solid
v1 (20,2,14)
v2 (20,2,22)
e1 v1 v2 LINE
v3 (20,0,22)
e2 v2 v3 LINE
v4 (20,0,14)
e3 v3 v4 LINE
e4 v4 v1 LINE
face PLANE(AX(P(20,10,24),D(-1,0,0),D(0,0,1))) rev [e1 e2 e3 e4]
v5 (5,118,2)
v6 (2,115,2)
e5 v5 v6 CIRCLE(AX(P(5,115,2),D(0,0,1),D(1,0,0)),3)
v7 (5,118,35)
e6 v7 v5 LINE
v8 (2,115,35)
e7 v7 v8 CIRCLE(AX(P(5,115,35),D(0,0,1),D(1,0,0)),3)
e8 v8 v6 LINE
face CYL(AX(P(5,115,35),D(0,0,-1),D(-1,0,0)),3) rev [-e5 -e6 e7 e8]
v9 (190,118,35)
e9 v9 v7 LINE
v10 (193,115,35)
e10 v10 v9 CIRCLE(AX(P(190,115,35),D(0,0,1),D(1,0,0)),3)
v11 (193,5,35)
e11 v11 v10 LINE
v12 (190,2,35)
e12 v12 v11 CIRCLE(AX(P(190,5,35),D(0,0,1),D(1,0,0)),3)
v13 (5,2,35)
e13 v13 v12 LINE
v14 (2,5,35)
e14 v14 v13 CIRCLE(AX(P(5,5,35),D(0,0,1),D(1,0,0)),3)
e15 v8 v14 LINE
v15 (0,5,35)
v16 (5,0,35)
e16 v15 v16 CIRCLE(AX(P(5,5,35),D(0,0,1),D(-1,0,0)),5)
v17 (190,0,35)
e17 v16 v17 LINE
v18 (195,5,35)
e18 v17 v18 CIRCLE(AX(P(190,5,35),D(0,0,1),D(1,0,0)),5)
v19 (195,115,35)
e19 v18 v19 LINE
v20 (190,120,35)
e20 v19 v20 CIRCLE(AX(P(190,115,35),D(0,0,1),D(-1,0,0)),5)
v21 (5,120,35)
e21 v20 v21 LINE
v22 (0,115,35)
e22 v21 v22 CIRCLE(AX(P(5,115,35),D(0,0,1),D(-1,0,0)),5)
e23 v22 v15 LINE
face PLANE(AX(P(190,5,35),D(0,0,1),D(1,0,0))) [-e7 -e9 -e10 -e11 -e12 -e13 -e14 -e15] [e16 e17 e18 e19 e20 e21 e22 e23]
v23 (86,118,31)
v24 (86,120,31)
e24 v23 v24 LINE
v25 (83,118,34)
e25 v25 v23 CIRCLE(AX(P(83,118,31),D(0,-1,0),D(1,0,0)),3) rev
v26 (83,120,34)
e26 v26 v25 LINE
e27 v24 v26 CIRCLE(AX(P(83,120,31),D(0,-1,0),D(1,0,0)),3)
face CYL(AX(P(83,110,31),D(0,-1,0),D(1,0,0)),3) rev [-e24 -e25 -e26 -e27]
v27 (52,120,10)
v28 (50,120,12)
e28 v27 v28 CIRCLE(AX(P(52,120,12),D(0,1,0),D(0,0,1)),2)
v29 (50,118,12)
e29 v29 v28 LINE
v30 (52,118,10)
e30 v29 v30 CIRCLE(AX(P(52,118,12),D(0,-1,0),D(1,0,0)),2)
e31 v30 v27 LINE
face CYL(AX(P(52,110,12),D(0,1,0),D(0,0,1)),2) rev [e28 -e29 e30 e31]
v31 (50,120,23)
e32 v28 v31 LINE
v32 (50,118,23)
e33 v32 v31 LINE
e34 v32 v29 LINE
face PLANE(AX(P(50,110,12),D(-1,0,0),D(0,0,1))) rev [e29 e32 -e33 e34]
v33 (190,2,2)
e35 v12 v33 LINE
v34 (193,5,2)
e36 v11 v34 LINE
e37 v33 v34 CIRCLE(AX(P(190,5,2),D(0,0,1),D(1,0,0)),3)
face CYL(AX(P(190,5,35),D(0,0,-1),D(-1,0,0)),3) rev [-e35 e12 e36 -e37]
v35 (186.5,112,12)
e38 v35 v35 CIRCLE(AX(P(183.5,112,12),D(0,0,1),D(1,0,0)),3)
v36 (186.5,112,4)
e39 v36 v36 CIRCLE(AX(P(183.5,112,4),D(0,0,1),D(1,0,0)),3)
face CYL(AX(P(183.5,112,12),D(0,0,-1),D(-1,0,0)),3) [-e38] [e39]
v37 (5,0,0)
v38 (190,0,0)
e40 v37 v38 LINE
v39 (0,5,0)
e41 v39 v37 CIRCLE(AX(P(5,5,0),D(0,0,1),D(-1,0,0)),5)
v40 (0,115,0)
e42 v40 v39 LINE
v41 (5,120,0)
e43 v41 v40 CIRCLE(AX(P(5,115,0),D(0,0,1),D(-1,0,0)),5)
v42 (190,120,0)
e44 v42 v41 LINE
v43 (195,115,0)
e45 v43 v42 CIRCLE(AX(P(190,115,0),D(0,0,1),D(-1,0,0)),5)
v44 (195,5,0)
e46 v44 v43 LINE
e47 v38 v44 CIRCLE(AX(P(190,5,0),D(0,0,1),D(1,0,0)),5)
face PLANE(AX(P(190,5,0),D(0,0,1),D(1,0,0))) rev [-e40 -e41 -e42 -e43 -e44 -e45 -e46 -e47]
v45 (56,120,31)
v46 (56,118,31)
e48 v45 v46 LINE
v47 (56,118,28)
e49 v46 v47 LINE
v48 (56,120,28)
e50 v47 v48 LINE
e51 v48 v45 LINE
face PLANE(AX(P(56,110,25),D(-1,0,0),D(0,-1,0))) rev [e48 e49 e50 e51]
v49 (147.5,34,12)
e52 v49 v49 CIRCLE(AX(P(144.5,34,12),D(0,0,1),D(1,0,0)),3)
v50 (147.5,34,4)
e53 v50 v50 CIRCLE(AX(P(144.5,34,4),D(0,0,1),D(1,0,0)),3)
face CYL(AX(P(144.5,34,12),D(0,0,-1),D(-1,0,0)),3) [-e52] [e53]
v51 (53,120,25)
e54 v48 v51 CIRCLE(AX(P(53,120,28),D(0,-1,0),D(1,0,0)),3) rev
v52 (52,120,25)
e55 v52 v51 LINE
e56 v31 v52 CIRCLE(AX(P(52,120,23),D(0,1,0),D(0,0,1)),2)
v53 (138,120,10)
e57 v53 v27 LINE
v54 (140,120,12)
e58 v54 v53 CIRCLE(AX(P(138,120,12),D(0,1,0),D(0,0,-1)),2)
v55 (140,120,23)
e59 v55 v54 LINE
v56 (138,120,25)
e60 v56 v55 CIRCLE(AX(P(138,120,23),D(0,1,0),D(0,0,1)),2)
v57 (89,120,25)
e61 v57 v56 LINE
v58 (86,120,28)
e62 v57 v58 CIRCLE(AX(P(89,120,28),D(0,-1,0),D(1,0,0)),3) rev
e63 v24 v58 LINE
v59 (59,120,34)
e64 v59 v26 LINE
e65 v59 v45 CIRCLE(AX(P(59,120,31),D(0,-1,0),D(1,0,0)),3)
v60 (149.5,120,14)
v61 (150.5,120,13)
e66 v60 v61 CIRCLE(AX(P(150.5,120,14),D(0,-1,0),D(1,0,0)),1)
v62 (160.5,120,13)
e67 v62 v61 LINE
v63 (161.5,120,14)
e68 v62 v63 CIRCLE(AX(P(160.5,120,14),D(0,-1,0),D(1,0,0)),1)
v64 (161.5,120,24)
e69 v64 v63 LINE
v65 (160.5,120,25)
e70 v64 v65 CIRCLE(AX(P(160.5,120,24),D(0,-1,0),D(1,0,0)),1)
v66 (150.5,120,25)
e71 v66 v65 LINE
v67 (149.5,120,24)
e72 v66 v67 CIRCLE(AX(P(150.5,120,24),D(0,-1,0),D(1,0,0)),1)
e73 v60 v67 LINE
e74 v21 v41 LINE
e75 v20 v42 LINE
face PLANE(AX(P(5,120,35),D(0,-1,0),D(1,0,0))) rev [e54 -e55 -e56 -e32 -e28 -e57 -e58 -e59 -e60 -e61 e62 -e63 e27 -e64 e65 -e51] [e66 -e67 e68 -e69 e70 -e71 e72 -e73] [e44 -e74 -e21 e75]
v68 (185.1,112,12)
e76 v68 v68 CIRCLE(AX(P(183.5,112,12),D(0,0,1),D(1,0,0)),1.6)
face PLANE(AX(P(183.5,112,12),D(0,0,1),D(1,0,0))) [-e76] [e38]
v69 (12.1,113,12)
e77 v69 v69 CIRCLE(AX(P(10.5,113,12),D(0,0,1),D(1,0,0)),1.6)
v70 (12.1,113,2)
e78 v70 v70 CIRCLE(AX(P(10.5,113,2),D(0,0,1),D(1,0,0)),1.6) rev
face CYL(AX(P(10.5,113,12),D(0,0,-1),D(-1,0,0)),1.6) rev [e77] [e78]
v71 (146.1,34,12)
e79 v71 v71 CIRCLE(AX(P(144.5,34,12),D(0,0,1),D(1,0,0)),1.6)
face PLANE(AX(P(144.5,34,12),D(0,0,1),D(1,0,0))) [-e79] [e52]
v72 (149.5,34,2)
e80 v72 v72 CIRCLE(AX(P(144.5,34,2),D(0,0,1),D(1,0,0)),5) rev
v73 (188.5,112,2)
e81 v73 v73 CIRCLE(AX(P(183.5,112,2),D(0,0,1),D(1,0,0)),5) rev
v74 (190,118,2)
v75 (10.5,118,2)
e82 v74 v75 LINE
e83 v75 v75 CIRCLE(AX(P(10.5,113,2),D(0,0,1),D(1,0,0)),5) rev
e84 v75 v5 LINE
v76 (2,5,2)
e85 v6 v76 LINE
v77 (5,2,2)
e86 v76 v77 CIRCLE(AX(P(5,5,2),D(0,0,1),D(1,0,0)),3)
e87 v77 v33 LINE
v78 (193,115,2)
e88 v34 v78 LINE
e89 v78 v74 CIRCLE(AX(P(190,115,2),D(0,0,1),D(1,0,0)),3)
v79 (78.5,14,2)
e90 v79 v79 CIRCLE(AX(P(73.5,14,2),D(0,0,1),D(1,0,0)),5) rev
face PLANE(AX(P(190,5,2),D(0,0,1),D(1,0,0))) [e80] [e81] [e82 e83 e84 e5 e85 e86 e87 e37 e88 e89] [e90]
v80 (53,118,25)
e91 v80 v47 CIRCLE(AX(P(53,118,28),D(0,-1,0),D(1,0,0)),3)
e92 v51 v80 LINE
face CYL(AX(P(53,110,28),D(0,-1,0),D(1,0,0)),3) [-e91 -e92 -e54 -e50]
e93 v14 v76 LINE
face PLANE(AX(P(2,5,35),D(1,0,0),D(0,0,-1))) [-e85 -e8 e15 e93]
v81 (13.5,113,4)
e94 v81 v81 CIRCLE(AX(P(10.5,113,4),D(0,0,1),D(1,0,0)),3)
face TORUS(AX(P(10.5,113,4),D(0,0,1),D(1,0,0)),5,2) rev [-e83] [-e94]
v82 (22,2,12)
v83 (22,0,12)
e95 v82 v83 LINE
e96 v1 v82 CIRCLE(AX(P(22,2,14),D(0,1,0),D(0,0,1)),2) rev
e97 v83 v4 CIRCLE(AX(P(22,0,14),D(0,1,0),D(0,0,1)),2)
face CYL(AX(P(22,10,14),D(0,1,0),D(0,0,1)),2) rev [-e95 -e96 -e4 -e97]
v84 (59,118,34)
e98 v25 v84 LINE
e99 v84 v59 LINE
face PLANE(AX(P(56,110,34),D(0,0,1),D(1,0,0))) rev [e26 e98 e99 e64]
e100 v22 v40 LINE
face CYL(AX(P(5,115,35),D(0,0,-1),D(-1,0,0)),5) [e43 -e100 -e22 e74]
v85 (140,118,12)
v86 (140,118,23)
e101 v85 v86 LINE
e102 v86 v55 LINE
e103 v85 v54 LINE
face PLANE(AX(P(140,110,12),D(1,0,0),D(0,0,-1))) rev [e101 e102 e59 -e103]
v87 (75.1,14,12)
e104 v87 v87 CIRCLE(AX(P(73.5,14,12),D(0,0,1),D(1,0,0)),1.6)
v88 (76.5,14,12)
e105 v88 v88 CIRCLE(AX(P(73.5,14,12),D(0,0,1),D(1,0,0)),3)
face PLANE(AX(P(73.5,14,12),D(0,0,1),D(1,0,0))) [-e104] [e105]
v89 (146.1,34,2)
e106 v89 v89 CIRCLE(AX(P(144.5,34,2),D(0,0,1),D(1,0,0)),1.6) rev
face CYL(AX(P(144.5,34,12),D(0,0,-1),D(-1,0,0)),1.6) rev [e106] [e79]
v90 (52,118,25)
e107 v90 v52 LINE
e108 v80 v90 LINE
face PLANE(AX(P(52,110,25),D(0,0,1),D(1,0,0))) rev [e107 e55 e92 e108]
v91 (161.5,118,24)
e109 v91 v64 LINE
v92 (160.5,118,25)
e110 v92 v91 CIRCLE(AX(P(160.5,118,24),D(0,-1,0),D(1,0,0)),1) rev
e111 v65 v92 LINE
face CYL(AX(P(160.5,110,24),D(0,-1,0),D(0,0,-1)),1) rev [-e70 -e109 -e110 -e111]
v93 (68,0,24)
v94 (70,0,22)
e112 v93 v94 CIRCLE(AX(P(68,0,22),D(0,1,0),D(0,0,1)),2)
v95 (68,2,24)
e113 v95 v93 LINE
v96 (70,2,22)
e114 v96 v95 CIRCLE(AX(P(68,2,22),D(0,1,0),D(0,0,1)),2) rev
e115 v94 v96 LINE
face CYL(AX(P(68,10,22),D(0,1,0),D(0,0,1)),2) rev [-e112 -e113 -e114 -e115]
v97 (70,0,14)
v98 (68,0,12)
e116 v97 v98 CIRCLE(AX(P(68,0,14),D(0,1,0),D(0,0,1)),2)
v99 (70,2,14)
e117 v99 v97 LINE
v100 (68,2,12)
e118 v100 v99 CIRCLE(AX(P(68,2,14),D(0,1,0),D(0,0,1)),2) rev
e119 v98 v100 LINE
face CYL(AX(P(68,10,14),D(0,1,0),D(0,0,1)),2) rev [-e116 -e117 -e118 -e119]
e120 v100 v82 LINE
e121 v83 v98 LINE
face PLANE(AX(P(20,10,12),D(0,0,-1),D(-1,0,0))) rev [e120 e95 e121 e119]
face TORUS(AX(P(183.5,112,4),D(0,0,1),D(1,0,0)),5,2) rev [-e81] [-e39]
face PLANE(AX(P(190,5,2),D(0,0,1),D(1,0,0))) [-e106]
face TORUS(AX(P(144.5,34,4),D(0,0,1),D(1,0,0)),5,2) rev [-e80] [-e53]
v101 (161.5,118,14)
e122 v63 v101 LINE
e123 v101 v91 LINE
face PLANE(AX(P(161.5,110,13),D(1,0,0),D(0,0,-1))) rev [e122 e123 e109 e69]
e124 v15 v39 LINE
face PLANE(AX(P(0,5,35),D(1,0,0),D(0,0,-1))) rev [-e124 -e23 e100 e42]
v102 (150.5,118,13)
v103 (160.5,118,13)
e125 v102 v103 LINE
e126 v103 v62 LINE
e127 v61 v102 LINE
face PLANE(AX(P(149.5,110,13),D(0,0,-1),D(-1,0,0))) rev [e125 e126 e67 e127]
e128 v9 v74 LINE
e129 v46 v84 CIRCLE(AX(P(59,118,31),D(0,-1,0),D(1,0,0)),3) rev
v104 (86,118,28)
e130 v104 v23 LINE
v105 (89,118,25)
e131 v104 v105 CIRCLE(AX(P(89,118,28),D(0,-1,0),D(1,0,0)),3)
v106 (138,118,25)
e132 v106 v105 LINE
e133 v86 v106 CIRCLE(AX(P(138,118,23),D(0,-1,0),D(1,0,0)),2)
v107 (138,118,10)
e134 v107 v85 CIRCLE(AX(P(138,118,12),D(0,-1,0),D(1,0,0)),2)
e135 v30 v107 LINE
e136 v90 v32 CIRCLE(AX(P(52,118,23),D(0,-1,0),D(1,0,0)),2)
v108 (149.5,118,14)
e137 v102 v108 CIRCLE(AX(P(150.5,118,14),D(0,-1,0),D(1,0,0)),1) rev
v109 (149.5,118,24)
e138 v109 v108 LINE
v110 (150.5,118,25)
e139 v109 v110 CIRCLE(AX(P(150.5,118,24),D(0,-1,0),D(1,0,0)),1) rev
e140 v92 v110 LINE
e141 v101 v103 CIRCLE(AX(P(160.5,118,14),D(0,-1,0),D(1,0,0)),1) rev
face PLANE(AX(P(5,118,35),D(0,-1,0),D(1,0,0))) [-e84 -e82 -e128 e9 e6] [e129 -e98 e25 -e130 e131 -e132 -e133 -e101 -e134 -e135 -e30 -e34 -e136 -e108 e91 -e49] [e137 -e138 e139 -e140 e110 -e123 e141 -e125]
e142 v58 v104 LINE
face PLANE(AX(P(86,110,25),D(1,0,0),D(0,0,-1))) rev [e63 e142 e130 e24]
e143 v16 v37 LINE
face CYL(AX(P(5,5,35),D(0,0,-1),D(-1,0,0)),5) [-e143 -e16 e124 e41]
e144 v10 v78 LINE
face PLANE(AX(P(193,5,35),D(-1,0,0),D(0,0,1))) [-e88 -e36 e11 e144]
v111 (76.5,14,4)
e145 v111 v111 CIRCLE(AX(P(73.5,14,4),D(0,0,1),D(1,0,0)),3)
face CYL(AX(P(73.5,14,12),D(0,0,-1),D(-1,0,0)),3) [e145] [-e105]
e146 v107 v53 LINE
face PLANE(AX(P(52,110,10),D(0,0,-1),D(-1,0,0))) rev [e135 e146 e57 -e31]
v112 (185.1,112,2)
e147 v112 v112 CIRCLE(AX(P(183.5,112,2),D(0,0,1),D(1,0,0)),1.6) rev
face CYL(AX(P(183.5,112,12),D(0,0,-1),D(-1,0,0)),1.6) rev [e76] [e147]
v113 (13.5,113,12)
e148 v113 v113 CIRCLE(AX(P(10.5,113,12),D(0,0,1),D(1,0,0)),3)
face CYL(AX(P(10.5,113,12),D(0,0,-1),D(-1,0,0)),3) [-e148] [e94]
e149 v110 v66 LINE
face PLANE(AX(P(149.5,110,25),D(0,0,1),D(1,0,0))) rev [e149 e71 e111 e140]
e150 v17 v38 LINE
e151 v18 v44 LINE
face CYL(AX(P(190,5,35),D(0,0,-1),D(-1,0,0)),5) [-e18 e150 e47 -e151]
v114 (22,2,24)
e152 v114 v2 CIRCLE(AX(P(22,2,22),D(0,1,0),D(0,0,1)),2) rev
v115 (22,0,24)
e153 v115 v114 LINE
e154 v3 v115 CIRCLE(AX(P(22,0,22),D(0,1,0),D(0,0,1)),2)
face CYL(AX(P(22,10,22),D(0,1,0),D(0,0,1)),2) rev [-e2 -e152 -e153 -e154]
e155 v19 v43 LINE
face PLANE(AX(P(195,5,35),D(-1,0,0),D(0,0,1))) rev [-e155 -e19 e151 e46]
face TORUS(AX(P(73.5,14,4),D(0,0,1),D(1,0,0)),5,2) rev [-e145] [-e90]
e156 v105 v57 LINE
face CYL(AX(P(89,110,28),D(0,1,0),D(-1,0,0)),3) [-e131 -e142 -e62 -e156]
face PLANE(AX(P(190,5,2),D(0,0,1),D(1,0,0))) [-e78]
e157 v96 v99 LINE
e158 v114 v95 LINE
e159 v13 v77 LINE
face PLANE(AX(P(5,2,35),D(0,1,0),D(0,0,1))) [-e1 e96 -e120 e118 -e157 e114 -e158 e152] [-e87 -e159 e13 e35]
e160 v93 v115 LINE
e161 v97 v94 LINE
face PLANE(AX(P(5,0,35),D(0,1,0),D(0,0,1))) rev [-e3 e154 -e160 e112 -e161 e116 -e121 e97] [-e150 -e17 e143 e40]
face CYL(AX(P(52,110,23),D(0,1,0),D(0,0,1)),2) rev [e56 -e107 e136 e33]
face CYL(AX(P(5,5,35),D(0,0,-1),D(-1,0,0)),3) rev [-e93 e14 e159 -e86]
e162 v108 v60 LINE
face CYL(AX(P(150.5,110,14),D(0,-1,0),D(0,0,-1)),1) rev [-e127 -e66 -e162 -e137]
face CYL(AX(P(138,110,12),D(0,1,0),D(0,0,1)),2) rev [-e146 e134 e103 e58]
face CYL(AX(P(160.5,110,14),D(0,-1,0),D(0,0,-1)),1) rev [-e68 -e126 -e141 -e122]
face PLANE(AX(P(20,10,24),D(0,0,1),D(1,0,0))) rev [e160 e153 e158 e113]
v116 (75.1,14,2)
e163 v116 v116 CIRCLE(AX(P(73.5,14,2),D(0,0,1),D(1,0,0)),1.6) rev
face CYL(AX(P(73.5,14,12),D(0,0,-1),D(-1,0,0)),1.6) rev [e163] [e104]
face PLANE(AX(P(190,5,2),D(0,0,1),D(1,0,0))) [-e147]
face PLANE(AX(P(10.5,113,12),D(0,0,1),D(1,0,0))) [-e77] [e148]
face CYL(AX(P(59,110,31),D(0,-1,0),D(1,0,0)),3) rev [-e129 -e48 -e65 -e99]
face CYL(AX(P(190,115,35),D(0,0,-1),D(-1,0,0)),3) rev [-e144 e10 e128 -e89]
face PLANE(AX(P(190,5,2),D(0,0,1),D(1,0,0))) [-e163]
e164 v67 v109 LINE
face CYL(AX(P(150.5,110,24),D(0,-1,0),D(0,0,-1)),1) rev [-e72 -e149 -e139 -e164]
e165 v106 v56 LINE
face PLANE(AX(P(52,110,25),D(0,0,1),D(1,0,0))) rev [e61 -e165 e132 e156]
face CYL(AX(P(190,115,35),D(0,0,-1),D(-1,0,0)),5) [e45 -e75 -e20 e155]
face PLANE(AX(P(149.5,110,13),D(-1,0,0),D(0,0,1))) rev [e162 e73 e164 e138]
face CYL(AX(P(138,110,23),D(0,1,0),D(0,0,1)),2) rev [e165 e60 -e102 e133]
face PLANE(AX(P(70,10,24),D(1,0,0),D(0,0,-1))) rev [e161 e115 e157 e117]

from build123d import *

# Parameters (mm, degrees)
BOSS_EXTRU_1_DEPTH      = 35
COQUE1_T                = -2
ESQUISSE2_W             = 12
ESQUISSE2_H             = 12
ENL_V_MAT_EXTRU_1_DEPTH = 10
ESQUISSE3_W             = 30
ESQUISSE3_H             = 9
ENL_V_MAT_EXTRU_2_DEPTH = 10
ESQUISSE4_W             = 50
ESQUISSE4_H             = 12
ENL_V_MAT_EXTRU_3_DEPTH = 10
CONG_1_R                = 3
CONG_2_R                = 1
CONG_3_R                = 2
ESQUISSE5_R             = 3
ESQUISSE5_R_2           = 1.6
BOSS_EXTRU_2_DEPTH      = 10
CONG_4_R                = 2


with BuildPart() as part:
    # Esquisse1 → Boss.-Extru.1 (new body)
    with BuildSketch(Plane.XY):
        with BuildLine():
            Line((5, 0), (190, 0))
            ThreePointArc((190, 0), (193.535533906, 1.464466094), (195, 5))
            Line((195, 5), (195, 115))
            ThreePointArc((195, 115), (193.535533906, 118.535533906), (190, 120))
            Line((190, 120), (5, 120))
            ThreePointArc((5, 120), (1.464466094, 118.535533906), (0, 115))
            Line((0, 115), (0, 5))
            ThreePointArc((0, 5), (1.464466094, 1.464466094), (5, 0))
        make_face()
    extrude(amount=BOSS_EXTRU_1_DEPTH)

    # Coque1
    coque1_openings = [part.faces().sort_by_distance(p)[0] for p in [
        (97.5, 60, 35),
    ]]
    offset(amount=COQUE1_T, openings=coque1_openings, kind=Kind.INTERSECTION)

    # Esquisse2 → Enlèv. mat.-Extru.1 (cut)
    with BuildSketch(Plane(origin=(0, 120, 0), x_dir=(1, 0, 0), z_dir=(0, 1, 0))):
        with Locations((155.5, -19)):
            Rectangle(ESQUISSE2_W, ESQUISSE2_H)
        with BuildLine():
            Line((52, -10), (138, -10))
            ThreePointArc((138, -10), (139.414213562, -10.585786438), (140, -12))
            Line((140, -12), (140, -23))
            ThreePointArc((140, -23), (139.414213562, -24.414213562), (138, -25))
            Line((138, -25), (52, -25))
            ThreePointArc((52, -25), (50.585786438, -24.414213562), (50, -23))
            Line((50, -23), (50, -12))
            ThreePointArc((50, -12), (50.585786438, -10.585786438), (52, -10))
        make_face()
    extrude(amount=-ENL_V_MAT_EXTRU_1_DEPTH, mode=Mode.SUBTRACT)

    # Esquisse3 → Enlèv. mat.-Extru.2 (cut)
    with BuildSketch(Plane(origin=(0, 120, 0), x_dir=(1, 0, 0), z_dir=(0, 1, 0))):
        with Locations((71, -29.5)):
            Rectangle(ESQUISSE3_W, ESQUISSE3_H)
    extrude(amount=-ENL_V_MAT_EXTRU_2_DEPTH, mode=Mode.SUBTRACT)

    # Esquisse4 → Enlèv. mat.-Extru.3 (cut)
    with BuildSketch(Plane.XZ):
        with Locations((45, 18)):
            Rectangle(ESQUISSE4_W, ESQUISSE4_H)
    extrude(amount=-ENL_V_MAT_EXTRU_3_DEPTH, mode=Mode.SUBTRACT)

    # Congé1
    cong_1_edges = [part.edges().sort_by_distance(p)[0] for p in [
        (86, 119, 25),
        (56, 119, 25),
        (56, 119, 34),
        (86, 119, 34),
    ]]
    fillet(cong_1_edges, radius=CONG_1_R)

    # Congé2
    cong_2_edges = [part.edges().sort_by_distance(p)[0] for p in [
        (149.5, 119, 25),
        (149.5, 119, 13),
        (161.5, 119, 13),
        (161.5, 119, 25),
    ]]
    fillet(cong_2_edges, radius=CONG_2_R)

    # Congé3
    cong_3_edges = [part.edges().sort_by_distance(p)[0] for p in [
        (20, 1, 12),
        (20, 1, 24),
        (70, 1, 24),
        (70, 1, 12),
    ]]
    fillet(cong_3_edges, radius=CONG_3_R)

    # Esquisse5 → Boss.-Extru.2 (add)
    # profile 1 of 4: a face of its own
    with BuildSketch(Plane.XY.offset(2)):
        with Locations((10.5, 113)):
            Circle(ESQUISSE5_R)
        with Locations((10.5, 113)):
            Circle(ESQUISSE5_R_2, mode=Mode.SUBTRACT)
    # profile 2 of 4: a face of its own
    with BuildSketch(Plane.XY.offset(2)):
        with Locations((73.5, 14)):
            Circle(ESQUISSE5_R)
        with Locations((73.5, 14)):
            Circle(ESQUISSE5_R_2, mode=Mode.SUBTRACT)
    # profile 3 of 4: a face of its own
    with BuildSketch(Plane.XY.offset(2)):
        with Locations((144.5, 34)):
            Circle(ESQUISSE5_R)
        with Locations((144.5, 34)):
            Circle(ESQUISSE5_R_2, mode=Mode.SUBTRACT)
    # profile 4 of 4: a face of its own
    with BuildSketch(Plane.XY.offset(2)):
        with Locations((183.5, 112)):
            Circle(ESQUISSE5_R)
        with Locations((183.5, 112)):
            Circle(ESQUISSE5_R_2, mode=Mode.SUBTRACT)
    extrude(amount=BOSS_EXTRU_2_DEPTH)

    # Congé4
    cong_4_edges = [part.edges().sort_by_distance(p)[0] for p in [
        (7.5, 113, 2),
        (70.5, 14, 2),
        (141.5, 34, 2),
        (180.5, 112, 2),
    ]]
    fillet(cong_4_edges, radius=CONG_4_R - 0.0001)  # a hair under: the kernel refuses the full size


solid = part.part
